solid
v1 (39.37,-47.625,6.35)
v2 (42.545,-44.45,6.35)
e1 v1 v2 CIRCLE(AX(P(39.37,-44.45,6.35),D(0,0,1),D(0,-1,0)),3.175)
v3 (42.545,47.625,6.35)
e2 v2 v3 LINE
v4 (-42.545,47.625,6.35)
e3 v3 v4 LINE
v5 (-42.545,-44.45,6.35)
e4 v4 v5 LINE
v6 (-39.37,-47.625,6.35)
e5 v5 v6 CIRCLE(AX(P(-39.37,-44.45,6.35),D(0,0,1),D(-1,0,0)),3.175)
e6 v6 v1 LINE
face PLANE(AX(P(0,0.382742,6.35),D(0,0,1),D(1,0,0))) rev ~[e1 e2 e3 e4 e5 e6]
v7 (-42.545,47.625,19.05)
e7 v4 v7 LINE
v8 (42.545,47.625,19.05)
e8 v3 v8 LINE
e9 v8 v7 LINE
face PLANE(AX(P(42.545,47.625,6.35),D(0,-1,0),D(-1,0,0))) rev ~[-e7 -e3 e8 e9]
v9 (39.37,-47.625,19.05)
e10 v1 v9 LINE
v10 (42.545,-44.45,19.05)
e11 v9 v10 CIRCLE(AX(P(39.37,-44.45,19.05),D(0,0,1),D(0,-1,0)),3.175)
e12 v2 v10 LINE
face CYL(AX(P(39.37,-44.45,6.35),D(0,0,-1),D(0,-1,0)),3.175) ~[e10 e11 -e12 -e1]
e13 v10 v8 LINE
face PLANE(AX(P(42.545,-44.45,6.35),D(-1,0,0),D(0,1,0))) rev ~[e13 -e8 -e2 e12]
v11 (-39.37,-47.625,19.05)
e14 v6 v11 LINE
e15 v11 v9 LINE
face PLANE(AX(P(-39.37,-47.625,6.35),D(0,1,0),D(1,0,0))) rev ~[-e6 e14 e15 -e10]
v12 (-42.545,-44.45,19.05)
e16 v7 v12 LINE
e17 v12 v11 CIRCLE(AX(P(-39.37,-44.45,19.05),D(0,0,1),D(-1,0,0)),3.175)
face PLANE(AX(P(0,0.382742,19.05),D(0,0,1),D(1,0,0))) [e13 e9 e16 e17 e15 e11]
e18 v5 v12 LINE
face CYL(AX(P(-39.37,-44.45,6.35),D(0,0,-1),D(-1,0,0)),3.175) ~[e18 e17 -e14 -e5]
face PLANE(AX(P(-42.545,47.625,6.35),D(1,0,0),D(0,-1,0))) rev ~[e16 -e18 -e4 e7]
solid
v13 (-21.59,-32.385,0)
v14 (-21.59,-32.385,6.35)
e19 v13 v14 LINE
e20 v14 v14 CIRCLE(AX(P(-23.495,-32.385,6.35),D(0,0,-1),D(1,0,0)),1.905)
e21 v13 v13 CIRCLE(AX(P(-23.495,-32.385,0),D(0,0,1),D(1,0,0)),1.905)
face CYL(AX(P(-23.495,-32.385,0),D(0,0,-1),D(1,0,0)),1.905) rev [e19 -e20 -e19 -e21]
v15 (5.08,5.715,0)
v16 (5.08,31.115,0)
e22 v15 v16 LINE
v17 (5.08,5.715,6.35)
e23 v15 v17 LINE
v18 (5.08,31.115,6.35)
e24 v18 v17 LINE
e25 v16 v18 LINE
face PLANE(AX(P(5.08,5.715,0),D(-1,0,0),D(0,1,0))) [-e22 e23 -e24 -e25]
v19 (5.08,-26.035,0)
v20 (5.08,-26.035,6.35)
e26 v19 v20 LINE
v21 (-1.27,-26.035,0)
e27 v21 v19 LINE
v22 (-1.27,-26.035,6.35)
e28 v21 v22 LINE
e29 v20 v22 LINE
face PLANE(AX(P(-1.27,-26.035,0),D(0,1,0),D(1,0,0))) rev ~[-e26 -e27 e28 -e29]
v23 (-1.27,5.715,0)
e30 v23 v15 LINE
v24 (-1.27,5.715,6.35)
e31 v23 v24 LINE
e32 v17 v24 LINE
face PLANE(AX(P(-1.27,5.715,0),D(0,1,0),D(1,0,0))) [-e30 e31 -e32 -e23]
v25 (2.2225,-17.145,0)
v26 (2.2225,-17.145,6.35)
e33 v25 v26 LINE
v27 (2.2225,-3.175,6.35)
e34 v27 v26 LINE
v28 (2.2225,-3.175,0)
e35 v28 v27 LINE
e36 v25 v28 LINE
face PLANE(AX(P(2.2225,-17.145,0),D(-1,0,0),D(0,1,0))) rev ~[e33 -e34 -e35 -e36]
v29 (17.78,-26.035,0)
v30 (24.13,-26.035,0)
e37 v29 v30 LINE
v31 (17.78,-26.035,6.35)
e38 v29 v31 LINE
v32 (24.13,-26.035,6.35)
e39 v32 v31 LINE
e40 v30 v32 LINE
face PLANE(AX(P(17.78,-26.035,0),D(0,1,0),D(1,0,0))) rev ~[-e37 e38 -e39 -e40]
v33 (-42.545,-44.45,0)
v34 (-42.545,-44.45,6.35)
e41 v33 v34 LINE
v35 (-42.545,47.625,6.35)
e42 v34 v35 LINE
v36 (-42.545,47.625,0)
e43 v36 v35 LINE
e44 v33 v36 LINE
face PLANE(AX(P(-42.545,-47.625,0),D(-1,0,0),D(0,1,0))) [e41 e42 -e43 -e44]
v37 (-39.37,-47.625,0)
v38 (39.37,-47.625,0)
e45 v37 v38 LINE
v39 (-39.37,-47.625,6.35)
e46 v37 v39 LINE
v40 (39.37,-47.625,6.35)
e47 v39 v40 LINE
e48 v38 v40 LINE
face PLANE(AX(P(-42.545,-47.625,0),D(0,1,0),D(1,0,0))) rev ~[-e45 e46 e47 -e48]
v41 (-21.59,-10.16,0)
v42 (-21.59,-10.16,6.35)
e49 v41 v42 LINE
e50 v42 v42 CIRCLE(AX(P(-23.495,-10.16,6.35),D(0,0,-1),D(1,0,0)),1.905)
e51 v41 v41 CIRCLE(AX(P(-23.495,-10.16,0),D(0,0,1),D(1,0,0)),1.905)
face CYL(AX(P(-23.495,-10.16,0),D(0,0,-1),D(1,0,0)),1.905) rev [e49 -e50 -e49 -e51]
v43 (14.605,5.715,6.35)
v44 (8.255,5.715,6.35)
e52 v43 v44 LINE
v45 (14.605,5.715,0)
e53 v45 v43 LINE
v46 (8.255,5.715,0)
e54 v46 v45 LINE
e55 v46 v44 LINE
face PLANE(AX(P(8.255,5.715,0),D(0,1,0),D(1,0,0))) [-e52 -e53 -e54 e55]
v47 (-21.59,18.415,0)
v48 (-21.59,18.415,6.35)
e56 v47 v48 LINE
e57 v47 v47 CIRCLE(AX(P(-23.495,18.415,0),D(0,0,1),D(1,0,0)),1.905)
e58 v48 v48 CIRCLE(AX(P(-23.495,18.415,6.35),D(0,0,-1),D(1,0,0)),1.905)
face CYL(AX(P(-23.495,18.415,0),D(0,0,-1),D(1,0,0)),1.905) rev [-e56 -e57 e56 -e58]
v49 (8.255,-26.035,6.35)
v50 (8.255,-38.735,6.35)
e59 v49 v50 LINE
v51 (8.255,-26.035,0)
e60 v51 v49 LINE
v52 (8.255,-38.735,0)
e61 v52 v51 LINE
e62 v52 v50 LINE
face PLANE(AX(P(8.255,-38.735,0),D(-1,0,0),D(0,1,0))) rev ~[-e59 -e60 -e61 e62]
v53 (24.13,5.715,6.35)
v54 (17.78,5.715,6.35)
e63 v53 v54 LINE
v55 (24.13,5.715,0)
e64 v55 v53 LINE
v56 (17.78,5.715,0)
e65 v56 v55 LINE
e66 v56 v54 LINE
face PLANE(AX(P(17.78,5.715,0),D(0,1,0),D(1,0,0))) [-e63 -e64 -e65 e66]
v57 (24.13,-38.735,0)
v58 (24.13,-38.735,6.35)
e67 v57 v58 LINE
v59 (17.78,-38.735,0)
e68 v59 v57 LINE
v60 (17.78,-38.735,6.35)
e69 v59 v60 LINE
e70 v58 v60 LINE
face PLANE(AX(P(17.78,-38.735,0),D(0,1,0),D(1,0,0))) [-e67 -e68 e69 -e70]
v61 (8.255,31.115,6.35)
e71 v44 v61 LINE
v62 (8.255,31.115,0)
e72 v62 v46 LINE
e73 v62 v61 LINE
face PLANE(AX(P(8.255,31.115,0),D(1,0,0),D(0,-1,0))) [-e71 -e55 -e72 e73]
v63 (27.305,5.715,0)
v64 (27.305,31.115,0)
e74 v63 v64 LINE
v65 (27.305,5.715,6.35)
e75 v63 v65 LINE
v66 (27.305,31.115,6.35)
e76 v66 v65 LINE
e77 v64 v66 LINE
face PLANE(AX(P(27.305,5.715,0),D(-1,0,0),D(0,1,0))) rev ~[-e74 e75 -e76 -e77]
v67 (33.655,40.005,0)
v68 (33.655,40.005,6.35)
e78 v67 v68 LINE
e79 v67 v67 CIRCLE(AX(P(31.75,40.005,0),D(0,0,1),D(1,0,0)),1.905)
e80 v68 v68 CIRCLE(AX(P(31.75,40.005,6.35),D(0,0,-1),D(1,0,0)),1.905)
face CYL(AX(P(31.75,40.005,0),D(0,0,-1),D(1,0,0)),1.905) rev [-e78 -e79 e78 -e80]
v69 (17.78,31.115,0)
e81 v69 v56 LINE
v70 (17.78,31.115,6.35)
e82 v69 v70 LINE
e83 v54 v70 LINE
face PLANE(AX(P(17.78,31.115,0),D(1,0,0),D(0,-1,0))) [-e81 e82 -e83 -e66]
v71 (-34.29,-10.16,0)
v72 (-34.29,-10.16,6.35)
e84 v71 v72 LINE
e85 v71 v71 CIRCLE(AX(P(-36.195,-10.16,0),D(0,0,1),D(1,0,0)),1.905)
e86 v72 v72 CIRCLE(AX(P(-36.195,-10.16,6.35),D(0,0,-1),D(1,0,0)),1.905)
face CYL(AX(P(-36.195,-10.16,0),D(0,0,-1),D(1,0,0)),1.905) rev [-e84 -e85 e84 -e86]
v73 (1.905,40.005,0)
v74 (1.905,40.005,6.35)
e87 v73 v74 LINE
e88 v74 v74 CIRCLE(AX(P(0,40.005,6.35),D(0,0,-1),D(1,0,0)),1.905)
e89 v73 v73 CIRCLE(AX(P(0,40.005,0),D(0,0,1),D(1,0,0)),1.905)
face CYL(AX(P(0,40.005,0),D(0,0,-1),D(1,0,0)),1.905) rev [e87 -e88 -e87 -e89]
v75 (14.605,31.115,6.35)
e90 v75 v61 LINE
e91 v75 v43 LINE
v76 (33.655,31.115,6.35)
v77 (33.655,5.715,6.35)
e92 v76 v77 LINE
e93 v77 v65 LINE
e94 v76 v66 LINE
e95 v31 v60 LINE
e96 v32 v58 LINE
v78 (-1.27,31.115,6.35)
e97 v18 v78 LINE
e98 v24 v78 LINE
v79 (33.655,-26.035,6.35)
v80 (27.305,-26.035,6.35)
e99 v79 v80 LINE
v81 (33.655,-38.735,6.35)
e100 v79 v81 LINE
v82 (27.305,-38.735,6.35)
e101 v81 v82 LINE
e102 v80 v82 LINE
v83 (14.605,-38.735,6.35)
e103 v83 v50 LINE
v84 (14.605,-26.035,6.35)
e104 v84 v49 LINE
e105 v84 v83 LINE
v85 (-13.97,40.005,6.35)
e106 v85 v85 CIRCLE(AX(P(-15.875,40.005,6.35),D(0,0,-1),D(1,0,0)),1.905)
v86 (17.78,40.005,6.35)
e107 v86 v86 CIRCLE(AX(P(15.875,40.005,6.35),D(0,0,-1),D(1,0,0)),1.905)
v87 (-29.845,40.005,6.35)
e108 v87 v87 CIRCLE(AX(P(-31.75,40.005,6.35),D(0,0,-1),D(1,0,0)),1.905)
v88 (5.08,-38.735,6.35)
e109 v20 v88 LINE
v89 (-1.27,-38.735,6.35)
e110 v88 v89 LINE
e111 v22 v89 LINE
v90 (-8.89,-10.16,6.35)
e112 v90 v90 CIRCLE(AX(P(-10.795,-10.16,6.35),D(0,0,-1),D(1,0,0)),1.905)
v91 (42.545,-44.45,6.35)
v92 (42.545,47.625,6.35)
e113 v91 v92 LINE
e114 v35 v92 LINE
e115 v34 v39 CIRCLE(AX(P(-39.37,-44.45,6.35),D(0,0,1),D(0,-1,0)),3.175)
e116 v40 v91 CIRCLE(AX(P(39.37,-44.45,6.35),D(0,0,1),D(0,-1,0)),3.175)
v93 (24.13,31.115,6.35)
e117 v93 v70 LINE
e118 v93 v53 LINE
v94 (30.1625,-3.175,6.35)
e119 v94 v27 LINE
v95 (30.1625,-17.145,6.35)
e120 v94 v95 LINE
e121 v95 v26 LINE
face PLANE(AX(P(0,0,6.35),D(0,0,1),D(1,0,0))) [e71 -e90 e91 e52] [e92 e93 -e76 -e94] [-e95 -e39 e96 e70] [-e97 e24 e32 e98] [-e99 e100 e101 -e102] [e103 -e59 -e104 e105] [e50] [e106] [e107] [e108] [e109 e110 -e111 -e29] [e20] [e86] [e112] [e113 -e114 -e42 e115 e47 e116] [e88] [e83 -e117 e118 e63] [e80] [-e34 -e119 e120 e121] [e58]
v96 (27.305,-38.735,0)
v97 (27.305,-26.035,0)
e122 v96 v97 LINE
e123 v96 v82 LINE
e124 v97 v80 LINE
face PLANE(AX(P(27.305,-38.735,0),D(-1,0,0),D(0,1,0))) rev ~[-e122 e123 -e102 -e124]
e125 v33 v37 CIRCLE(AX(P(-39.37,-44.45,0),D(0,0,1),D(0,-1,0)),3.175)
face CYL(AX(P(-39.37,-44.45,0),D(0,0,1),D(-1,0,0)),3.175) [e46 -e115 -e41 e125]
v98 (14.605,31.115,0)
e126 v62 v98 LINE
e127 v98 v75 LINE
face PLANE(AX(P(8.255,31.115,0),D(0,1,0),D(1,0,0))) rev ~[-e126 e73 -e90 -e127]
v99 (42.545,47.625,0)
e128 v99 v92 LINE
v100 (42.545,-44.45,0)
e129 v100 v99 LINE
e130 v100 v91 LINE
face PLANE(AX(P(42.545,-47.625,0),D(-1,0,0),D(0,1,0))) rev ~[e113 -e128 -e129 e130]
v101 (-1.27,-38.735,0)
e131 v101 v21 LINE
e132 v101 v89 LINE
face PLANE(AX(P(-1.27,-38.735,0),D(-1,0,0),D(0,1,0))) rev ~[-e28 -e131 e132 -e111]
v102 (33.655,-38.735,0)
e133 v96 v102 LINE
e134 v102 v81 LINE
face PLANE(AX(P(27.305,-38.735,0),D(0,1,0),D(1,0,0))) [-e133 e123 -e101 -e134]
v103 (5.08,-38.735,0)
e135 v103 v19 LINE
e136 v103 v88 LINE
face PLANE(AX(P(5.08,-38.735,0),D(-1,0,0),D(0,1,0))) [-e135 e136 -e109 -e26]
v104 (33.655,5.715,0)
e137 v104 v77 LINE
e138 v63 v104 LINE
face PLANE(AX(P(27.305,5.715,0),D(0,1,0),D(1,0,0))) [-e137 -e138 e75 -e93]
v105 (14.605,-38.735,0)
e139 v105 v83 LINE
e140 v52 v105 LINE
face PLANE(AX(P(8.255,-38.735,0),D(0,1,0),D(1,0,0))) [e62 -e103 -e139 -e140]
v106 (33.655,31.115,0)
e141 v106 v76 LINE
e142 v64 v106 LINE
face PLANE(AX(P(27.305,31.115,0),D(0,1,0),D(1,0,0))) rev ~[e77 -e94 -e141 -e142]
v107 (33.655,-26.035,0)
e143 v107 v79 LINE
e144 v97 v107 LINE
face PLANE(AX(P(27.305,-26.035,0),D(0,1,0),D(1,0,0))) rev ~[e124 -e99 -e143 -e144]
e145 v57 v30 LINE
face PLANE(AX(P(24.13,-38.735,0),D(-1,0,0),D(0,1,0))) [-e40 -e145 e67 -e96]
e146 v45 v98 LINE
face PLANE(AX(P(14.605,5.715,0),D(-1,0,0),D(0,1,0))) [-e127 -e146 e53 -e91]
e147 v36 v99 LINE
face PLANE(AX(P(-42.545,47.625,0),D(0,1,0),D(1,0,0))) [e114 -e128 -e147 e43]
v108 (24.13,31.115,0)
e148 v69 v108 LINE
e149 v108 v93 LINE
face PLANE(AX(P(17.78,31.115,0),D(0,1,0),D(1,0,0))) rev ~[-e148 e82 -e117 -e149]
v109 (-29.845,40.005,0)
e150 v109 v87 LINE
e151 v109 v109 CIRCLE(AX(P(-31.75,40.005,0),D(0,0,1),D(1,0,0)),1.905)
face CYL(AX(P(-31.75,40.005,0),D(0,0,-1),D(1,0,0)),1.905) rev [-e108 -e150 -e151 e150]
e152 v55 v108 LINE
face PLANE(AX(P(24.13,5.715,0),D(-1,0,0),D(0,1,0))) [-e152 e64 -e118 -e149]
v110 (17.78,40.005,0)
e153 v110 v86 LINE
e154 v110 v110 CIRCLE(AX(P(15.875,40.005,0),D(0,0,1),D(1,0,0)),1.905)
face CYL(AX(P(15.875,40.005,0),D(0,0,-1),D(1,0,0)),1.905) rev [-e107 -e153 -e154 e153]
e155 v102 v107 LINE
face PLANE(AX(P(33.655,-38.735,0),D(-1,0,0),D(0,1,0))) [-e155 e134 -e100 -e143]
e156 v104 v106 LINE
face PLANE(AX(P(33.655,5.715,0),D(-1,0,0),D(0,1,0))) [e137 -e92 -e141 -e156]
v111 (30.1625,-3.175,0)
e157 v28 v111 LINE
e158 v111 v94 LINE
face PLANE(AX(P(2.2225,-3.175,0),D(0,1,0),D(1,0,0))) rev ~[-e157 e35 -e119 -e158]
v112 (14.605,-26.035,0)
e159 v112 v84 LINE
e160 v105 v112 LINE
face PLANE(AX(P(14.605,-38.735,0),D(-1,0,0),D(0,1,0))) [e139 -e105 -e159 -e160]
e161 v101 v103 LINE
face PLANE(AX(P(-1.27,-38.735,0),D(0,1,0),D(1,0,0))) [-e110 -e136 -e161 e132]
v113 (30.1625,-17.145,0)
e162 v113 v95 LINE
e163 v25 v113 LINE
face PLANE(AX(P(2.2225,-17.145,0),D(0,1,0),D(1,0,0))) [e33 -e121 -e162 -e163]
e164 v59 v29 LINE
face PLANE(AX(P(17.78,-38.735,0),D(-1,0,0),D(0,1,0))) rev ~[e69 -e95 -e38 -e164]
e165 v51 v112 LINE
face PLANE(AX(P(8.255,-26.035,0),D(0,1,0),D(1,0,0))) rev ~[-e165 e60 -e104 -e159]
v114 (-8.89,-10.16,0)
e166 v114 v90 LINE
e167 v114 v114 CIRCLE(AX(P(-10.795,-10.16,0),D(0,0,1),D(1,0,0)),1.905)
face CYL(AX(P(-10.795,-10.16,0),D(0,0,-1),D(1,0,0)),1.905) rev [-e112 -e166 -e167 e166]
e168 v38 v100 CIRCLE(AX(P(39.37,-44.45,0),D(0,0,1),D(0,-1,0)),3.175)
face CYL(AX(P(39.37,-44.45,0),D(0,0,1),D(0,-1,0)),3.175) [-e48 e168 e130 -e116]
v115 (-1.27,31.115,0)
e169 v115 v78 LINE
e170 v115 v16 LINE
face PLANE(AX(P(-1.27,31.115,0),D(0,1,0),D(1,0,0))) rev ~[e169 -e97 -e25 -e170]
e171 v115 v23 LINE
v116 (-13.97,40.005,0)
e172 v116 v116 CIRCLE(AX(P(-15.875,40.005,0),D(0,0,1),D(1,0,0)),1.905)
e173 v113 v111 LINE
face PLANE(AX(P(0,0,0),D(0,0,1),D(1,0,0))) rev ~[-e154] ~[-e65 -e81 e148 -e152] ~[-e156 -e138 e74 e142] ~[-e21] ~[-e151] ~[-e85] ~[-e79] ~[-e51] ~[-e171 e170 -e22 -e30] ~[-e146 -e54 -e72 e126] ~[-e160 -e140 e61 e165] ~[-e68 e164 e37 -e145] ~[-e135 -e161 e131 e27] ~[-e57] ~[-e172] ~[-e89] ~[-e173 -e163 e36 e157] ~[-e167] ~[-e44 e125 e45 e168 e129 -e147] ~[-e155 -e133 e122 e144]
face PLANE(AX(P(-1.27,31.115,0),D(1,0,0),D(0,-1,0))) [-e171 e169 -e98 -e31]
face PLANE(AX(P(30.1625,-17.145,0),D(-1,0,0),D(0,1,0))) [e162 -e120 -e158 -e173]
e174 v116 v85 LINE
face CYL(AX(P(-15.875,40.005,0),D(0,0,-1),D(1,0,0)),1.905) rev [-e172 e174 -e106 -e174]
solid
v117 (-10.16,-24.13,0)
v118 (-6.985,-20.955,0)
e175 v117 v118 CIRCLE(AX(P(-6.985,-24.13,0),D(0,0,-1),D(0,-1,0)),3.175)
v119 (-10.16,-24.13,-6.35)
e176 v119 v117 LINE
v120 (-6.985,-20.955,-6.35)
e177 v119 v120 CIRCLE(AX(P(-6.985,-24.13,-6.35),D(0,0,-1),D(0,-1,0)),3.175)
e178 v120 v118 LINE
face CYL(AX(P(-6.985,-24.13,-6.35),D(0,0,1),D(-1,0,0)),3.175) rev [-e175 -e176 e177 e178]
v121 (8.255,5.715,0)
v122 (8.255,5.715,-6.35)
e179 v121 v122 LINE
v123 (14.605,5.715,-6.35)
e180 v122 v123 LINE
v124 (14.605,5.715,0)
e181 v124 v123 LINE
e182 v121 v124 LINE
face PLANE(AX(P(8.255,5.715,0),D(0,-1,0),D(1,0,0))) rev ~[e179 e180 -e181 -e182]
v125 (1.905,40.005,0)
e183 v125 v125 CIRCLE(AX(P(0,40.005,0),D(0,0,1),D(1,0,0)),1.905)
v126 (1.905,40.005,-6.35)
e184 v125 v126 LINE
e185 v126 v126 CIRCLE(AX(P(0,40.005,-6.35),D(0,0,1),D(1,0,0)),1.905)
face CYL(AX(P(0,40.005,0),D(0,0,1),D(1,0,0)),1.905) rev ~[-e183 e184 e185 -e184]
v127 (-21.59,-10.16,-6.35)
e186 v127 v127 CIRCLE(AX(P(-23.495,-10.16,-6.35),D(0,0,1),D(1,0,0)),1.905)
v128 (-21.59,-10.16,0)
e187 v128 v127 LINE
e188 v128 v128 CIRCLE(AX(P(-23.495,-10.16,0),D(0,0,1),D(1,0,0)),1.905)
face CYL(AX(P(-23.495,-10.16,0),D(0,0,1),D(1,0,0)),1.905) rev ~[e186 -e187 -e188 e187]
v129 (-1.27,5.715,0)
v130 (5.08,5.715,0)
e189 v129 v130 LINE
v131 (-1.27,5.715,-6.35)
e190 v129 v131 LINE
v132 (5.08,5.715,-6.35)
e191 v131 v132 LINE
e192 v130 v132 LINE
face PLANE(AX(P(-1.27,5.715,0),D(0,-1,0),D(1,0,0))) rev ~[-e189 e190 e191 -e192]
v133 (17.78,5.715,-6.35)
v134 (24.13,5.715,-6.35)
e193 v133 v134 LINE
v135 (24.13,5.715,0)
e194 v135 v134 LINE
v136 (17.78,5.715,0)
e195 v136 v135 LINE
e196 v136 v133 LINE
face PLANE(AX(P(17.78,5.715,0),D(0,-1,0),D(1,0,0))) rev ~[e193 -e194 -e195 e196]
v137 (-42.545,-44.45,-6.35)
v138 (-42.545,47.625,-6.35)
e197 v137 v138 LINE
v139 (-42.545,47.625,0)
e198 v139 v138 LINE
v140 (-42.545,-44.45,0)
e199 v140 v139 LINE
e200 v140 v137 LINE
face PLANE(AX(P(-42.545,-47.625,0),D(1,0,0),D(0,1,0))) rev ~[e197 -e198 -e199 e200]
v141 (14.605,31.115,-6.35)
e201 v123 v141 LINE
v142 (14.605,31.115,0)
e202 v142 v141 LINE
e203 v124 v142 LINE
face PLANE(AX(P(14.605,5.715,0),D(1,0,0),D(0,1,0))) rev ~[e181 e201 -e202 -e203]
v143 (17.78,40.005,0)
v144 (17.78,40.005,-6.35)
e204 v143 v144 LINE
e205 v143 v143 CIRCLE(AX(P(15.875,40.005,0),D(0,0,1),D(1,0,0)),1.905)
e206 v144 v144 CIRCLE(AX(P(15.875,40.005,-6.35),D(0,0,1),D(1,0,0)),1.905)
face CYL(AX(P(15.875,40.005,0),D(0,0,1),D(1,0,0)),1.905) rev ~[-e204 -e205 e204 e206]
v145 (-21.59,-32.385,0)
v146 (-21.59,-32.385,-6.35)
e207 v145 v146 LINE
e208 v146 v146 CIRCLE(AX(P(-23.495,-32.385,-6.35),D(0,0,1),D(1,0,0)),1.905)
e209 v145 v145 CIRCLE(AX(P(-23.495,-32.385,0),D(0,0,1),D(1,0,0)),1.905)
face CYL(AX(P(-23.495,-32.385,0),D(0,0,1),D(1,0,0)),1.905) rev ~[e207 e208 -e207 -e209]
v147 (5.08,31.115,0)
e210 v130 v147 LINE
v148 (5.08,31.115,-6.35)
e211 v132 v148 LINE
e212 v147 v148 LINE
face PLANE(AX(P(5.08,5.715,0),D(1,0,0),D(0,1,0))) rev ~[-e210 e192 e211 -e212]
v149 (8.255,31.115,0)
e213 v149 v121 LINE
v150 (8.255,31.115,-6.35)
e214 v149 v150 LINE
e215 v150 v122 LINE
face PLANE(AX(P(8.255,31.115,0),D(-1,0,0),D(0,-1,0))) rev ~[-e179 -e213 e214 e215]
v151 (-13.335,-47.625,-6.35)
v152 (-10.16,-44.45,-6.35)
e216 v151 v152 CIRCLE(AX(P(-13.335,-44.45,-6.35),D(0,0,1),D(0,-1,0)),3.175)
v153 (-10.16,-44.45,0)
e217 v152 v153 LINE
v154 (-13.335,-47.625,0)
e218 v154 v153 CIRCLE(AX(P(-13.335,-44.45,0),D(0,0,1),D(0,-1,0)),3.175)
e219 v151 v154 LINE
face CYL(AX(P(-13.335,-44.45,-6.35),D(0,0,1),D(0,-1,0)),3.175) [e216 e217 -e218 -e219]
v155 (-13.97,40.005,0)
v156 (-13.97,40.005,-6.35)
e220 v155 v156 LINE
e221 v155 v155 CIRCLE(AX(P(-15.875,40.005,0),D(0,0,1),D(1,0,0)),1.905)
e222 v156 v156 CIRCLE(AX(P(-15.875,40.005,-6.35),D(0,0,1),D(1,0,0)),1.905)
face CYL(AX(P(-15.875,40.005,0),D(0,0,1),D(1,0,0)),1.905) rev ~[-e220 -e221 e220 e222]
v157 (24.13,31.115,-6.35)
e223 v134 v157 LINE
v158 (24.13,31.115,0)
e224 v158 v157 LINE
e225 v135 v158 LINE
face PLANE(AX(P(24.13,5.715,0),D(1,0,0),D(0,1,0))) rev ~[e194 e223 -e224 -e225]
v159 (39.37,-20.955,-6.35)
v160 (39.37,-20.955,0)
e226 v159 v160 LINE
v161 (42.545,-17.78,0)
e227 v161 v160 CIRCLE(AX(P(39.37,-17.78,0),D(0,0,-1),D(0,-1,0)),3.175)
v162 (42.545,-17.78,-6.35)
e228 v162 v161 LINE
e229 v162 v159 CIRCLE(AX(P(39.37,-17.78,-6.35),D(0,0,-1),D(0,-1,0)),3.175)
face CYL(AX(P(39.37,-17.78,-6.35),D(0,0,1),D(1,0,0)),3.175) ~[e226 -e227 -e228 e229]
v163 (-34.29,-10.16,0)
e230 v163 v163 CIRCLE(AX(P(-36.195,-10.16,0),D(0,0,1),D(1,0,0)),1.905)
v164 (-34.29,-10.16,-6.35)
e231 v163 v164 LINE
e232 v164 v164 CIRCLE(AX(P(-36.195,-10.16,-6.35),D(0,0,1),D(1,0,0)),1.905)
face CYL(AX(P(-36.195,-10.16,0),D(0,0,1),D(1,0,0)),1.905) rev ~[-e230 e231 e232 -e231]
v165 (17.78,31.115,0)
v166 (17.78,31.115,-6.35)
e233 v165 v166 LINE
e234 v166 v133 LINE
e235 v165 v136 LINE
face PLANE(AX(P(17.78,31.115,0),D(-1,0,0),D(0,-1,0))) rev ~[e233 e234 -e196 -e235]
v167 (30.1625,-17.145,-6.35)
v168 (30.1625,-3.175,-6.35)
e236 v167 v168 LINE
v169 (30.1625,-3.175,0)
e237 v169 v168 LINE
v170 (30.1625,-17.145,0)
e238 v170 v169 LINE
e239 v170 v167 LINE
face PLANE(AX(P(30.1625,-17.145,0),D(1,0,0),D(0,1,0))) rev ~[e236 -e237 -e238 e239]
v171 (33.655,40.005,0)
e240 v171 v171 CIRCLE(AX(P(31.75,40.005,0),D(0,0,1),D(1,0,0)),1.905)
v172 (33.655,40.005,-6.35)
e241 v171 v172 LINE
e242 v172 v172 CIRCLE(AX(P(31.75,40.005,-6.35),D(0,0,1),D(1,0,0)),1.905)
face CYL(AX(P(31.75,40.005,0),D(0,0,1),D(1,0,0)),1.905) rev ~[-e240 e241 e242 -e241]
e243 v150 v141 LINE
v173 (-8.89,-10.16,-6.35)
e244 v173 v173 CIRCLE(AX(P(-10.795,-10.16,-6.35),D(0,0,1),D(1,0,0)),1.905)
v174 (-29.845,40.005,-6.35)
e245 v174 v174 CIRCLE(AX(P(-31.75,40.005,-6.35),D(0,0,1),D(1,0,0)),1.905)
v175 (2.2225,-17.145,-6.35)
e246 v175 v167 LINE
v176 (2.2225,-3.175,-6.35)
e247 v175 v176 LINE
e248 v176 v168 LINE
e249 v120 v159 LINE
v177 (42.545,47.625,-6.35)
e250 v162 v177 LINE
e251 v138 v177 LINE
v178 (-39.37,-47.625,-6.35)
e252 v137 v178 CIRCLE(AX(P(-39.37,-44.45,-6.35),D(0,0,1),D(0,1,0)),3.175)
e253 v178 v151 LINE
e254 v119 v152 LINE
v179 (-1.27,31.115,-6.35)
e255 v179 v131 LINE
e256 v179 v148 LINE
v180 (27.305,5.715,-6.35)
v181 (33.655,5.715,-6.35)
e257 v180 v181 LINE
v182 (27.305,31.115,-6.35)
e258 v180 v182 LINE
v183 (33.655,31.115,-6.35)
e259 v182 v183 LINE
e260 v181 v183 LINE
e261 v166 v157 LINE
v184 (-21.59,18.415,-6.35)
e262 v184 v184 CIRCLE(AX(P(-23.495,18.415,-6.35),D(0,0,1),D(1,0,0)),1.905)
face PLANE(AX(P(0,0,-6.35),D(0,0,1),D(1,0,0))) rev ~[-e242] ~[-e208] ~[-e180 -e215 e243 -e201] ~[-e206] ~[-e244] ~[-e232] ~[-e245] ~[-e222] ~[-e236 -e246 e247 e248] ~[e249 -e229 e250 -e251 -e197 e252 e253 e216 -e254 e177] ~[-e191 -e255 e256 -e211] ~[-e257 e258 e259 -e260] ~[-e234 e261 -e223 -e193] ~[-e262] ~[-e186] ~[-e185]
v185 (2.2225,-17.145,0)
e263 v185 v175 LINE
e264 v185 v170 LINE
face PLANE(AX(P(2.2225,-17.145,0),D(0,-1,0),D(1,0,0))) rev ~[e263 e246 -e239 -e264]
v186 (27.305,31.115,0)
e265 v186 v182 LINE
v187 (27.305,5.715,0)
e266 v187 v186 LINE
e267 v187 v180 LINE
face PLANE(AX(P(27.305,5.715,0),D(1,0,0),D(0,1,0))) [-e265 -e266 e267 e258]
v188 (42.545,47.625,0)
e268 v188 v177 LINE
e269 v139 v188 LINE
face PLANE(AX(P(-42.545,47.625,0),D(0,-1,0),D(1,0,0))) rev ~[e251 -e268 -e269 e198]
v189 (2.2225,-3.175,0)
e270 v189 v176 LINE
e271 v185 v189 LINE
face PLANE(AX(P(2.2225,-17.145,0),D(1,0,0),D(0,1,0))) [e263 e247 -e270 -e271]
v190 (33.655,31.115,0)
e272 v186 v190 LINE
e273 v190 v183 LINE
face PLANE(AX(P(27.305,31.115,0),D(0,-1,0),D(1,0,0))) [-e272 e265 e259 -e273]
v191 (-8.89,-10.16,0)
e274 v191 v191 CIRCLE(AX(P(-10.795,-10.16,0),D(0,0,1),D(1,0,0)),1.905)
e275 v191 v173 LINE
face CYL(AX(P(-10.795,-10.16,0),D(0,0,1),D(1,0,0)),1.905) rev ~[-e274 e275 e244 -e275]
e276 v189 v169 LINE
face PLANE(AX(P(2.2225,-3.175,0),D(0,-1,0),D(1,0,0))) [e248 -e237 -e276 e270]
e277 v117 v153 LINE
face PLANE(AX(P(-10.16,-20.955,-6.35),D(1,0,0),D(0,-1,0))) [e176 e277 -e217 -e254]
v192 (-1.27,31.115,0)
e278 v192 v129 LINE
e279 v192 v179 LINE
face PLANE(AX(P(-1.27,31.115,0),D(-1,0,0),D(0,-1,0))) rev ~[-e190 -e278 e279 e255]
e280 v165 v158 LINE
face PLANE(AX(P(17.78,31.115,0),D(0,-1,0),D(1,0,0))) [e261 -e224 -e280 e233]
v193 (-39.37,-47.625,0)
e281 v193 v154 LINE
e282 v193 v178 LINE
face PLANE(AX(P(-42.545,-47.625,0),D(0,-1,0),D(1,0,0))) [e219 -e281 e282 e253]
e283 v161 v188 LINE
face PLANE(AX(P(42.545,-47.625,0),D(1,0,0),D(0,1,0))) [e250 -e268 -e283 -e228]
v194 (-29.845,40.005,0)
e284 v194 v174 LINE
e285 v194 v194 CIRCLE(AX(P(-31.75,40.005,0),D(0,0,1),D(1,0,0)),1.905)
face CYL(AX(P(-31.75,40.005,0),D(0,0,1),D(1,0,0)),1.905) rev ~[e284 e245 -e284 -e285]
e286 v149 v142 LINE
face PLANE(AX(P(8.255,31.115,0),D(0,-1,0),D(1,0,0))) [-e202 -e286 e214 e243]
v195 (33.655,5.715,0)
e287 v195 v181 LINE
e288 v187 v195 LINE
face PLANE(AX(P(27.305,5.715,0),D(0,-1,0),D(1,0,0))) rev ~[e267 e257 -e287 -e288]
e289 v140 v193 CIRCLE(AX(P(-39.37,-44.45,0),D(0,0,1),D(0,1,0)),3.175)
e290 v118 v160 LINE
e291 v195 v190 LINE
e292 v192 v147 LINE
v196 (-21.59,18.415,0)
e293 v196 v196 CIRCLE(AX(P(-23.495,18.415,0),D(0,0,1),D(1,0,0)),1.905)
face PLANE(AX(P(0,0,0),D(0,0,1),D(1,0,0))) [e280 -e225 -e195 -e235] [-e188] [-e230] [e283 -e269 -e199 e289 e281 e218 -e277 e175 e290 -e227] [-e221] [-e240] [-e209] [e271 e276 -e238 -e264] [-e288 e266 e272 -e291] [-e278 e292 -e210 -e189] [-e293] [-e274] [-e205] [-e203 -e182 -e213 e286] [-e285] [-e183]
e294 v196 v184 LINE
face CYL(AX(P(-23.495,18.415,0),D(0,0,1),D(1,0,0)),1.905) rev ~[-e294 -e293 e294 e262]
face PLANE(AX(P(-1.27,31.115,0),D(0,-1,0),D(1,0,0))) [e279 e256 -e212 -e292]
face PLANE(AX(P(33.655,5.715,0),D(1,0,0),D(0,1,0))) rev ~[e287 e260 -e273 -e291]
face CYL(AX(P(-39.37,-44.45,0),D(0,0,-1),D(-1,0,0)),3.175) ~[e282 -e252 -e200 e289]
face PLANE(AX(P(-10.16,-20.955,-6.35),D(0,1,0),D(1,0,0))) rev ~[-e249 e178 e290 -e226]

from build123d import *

# Parameters (mm, degrees)
F0_W      = 85.09
F0_H      = 95.25
F1_DEPTH  = 6.35
F2_R      = 1.905
F2_W      = 6.35
F2_H      = 12.7
F2_H_2    = 6.35
F2_H_3    = 25.4
F2_W_2    = 27.94
F2_H_4    = 13.97
F3_DEPTH  = 6.351
F4_DEPTH  = 133
F5_DEPTH  = 6.35
F6_W      = 52.705
F6_H      = 26.67
F6_W_2    = 6.35
F6_H_2    = 12.7
F7_DEPTH  = 6.35
F8_R      = 3.175
F8_2_R    = 3.175
F10_DEPTH = 12.7


# Not quite as in the source:
# - an extrude ends at something that could not be found from the text; its depth is read off the source's solid


with BuildPart() as f1:
    # F0 (on Top) → F1 (new body)
    with BuildSketch(Plane.XY):
        Rectangle(F0_W, F0_H)
    extrude(amount=F1_DEPTH)

    # F2 (on Top) → F3 (cut, through all)
    with BuildSketch(Plane.XY):
        with Locations((-23.495, -32.385)):
            Circle(F2_R)
        with Locations((-23.495, 18.415)):
            Circle(F2_R)
        with Locations((1.905, -32.385)):
            Rectangle(F2_W, F2_H)
        with Locations((1.905, 27.94)):
            Rectangle(F2_W, F2_H_2)
        with Locations((1.905, 18.415)):
            Rectangle(F2_W, F2_H)
        with Locations((1.905, 8.89)):
            Rectangle(F2_W, F2_H_2)
        with Locations((20.955, 18.415)):
            Rectangle(F2_W, F2_H)
        with Locations((20.955, 27.94)):
            Rectangle(F2_W, F2_H_2)
        with Locations((20.955, 8.89)):
            Rectangle(F2_W, F2_H_2)
        with Locations((20.955, -32.385)):
            Rectangle(F2_W, F2_H)
        with Locations((11.43, 27.94)):
            Rectangle(F2_W, F2_H_2)
        with Locations((11.43, 18.415)):
            Rectangle(F2_W, F2_H)
        with Locations((11.43, 8.89)):
            Rectangle(F2_W, F2_H_2)
        with Locations((11.43, -32.385)):
            Rectangle(F2_W, F2_H)
        with Locations((30.48, -32.385)):
            Rectangle(F2_W, F2_H)
        with Locations((30.48, 18.415)):
            Rectangle(F2_W, F2_H_3)
        with Locations((16.1925, -10.16)):
            Rectangle(F2_W_2, F2_H_4)
        with Locations((-23.495, -10.16)):
            Circle(F2_R)
        with Locations((-36.195, -10.16)):
            Circle(F2_R)
        with Locations((-10.795, -10.16)):
            Circle(F2_R)
        with Locations((-31.75, 40.005)):
            Circle(F2_R)
        with Locations((-15.875, 40.005)):
            Circle(F2_R)
        with Locations((0, 40.005)):
            Circle(F2_R)
        with Locations((15.875, 40.005)):
            Circle(F2_R)
        with Locations((31.75, 40.005)):
            Circle(F2_R)
    extrude(amount=F3_DEPTH, mode=Mode.SUBTRACT)

    # F2 (on Top) → F4 (cut, through all)
    with BuildSketch(Plane.XY):
        with Locations((-23.495, -32.385)):
            Circle(F2_R)
        with Locations((-23.495, 18.415)):
            Circle(F2_R)
        with Locations((1.905, -32.385)):
            Rectangle(F2_W, F2_H)
        with Locations((1.905, 27.94)):
            Rectangle(F2_W, F2_H_2)
        with Locations((1.905, 18.415)):
            Rectangle(F2_W, F2_H)
        with Locations((1.905, 8.89)):
            Rectangle(F2_W, F2_H_2)
        with Locations((20.955, 18.415)):
            Rectangle(F2_W, F2_H)
        with Locations((20.955, 27.94)):
            Rectangle(F2_W, F2_H_2)
        with Locations((20.955, 8.89)):
            Rectangle(F2_W, F2_H_2)
        with Locations((20.955, -32.385)):
            Rectangle(F2_W, F2_H)
        with Locations((11.43, 27.94)):
            Rectangle(F2_W, F2_H_2)
        with Locations((11.43, 18.415)):
            Rectangle(F2_W, F2_H)
        with Locations((11.43, 8.89)):
            Rectangle(F2_W, F2_H_2)
        with Locations((11.43, -32.385)):
            Rectangle(F2_W, F2_H)
        with Locations((30.48, -32.385)):
            Rectangle(F2_W, F2_H)
        with Locations((30.48, 18.415)):
            Rectangle(F2_W, F2_H_3)
        with Locations((16.1925, -10.16)):
            Rectangle(F2_W_2, F2_H_4)
        with Locations((-23.495, -10.16)):
            Circle(F2_R)
        with Locations((-36.195, -10.16)):
            Circle(F2_R)
        with Locations((-10.795, -10.16)):
            Circle(F2_R)
        with Locations((-31.75, 40.005)):
            Circle(F2_R)
        with Locations((-15.875, 40.005)):
            Circle(F2_R)
        with Locations((0, 40.005)):
            Circle(F2_R)
        with Locations((15.875, 40.005)):
            Circle(F2_R)
        with Locations((31.75, 40.005)):
            Circle(F2_R)
    extrude(amount=-F4_DEPTH, mode=Mode.SUBTRACT)


with BuildPart() as f5:
    # F5 (new): a face of the model
    f5_faces = [f1.part.faces().sort_by_distance(p)[0] for p in [
        (-3.113503162, 0.1142969889, 0),
    ]]
    extrude(f5_faces, amount=F5_DEPTH)

    # F6 (on face) → F7 (cut, through all)
    with BuildSketch(Plane(origin=(0, 0, -6.35), x_dir=(1, 0, 0), z_dir=(0, 0, -1))):
        with Locations((16.1925, 34.29)):
            Rectangle(F6_W, F6_H)
        with Locations((1.905, 32.385)):
            Rectangle(F6_W_2, F6_H_2, mode=Mode.SUBTRACT)
        with Locations((11.43, 32.385)):
            Rectangle(F6_W_2, F6_H_2, mode=Mode.SUBTRACT)
        with Locations((20.955, 32.385)):
            Rectangle(F6_W_2, F6_H_2, mode=Mode.SUBTRACT)
        with Locations((30.48, 32.385)):
            Rectangle(F6_W_2, F6_H_2, mode=Mode.SUBTRACT)
    extrude(amount=-F7_DEPTH, mode=Mode.SUBTRACT)

    # F8#2
    f8_2_edges = [f5.edges().sort_by_distance(p)[0] for p in [
        (-10.16, -47.625, -3.175),
        (-10.16, -20.955, -3.175),
        (42.545, -20.955, -3.175),
        (-42.545, -47.625, -3.175),
    ]]
    fillet(f8_2_edges, radius=F8_2_R)


with BuildPart() as f1_1:
    add(f1.part)

    # F8
    f8_edges = [f1_1.edges().sort_by_distance(p)[0] for p in [
        (42.545, -47.625, 3.175),
        (-42.545, -47.625, 3.175),
    ]]
    fillet(f8_edges, radius=F8_R)


with BuildPart() as f10:
    # F9 (on face) → F10 (new body)
    with BuildSketch(Plane.XY.offset(6.35)):
        with BuildLine():
            Line((42.545, 47.625), (-42.545, 47.625))
            Line((-42.545, 47.625), (-42.545, -44.45))
            ThreePointArc((-42.545, -44.45), (-41.6150640303, -46.6950640303), (-39.37, -47.625))
            Line((-39.37, -47.625), (39.37, -47.625))
            ThreePointArc((39.37, -47.625), (41.6150640303, -46.6950640303), (42.545, -44.45))
            Line((42.545, -44.45), (42.545, 47.625))
        make_face()
    extrude(amount=F10_DEPTH)


solid = Compound([f5.part, f1_1.part, f10.part])
